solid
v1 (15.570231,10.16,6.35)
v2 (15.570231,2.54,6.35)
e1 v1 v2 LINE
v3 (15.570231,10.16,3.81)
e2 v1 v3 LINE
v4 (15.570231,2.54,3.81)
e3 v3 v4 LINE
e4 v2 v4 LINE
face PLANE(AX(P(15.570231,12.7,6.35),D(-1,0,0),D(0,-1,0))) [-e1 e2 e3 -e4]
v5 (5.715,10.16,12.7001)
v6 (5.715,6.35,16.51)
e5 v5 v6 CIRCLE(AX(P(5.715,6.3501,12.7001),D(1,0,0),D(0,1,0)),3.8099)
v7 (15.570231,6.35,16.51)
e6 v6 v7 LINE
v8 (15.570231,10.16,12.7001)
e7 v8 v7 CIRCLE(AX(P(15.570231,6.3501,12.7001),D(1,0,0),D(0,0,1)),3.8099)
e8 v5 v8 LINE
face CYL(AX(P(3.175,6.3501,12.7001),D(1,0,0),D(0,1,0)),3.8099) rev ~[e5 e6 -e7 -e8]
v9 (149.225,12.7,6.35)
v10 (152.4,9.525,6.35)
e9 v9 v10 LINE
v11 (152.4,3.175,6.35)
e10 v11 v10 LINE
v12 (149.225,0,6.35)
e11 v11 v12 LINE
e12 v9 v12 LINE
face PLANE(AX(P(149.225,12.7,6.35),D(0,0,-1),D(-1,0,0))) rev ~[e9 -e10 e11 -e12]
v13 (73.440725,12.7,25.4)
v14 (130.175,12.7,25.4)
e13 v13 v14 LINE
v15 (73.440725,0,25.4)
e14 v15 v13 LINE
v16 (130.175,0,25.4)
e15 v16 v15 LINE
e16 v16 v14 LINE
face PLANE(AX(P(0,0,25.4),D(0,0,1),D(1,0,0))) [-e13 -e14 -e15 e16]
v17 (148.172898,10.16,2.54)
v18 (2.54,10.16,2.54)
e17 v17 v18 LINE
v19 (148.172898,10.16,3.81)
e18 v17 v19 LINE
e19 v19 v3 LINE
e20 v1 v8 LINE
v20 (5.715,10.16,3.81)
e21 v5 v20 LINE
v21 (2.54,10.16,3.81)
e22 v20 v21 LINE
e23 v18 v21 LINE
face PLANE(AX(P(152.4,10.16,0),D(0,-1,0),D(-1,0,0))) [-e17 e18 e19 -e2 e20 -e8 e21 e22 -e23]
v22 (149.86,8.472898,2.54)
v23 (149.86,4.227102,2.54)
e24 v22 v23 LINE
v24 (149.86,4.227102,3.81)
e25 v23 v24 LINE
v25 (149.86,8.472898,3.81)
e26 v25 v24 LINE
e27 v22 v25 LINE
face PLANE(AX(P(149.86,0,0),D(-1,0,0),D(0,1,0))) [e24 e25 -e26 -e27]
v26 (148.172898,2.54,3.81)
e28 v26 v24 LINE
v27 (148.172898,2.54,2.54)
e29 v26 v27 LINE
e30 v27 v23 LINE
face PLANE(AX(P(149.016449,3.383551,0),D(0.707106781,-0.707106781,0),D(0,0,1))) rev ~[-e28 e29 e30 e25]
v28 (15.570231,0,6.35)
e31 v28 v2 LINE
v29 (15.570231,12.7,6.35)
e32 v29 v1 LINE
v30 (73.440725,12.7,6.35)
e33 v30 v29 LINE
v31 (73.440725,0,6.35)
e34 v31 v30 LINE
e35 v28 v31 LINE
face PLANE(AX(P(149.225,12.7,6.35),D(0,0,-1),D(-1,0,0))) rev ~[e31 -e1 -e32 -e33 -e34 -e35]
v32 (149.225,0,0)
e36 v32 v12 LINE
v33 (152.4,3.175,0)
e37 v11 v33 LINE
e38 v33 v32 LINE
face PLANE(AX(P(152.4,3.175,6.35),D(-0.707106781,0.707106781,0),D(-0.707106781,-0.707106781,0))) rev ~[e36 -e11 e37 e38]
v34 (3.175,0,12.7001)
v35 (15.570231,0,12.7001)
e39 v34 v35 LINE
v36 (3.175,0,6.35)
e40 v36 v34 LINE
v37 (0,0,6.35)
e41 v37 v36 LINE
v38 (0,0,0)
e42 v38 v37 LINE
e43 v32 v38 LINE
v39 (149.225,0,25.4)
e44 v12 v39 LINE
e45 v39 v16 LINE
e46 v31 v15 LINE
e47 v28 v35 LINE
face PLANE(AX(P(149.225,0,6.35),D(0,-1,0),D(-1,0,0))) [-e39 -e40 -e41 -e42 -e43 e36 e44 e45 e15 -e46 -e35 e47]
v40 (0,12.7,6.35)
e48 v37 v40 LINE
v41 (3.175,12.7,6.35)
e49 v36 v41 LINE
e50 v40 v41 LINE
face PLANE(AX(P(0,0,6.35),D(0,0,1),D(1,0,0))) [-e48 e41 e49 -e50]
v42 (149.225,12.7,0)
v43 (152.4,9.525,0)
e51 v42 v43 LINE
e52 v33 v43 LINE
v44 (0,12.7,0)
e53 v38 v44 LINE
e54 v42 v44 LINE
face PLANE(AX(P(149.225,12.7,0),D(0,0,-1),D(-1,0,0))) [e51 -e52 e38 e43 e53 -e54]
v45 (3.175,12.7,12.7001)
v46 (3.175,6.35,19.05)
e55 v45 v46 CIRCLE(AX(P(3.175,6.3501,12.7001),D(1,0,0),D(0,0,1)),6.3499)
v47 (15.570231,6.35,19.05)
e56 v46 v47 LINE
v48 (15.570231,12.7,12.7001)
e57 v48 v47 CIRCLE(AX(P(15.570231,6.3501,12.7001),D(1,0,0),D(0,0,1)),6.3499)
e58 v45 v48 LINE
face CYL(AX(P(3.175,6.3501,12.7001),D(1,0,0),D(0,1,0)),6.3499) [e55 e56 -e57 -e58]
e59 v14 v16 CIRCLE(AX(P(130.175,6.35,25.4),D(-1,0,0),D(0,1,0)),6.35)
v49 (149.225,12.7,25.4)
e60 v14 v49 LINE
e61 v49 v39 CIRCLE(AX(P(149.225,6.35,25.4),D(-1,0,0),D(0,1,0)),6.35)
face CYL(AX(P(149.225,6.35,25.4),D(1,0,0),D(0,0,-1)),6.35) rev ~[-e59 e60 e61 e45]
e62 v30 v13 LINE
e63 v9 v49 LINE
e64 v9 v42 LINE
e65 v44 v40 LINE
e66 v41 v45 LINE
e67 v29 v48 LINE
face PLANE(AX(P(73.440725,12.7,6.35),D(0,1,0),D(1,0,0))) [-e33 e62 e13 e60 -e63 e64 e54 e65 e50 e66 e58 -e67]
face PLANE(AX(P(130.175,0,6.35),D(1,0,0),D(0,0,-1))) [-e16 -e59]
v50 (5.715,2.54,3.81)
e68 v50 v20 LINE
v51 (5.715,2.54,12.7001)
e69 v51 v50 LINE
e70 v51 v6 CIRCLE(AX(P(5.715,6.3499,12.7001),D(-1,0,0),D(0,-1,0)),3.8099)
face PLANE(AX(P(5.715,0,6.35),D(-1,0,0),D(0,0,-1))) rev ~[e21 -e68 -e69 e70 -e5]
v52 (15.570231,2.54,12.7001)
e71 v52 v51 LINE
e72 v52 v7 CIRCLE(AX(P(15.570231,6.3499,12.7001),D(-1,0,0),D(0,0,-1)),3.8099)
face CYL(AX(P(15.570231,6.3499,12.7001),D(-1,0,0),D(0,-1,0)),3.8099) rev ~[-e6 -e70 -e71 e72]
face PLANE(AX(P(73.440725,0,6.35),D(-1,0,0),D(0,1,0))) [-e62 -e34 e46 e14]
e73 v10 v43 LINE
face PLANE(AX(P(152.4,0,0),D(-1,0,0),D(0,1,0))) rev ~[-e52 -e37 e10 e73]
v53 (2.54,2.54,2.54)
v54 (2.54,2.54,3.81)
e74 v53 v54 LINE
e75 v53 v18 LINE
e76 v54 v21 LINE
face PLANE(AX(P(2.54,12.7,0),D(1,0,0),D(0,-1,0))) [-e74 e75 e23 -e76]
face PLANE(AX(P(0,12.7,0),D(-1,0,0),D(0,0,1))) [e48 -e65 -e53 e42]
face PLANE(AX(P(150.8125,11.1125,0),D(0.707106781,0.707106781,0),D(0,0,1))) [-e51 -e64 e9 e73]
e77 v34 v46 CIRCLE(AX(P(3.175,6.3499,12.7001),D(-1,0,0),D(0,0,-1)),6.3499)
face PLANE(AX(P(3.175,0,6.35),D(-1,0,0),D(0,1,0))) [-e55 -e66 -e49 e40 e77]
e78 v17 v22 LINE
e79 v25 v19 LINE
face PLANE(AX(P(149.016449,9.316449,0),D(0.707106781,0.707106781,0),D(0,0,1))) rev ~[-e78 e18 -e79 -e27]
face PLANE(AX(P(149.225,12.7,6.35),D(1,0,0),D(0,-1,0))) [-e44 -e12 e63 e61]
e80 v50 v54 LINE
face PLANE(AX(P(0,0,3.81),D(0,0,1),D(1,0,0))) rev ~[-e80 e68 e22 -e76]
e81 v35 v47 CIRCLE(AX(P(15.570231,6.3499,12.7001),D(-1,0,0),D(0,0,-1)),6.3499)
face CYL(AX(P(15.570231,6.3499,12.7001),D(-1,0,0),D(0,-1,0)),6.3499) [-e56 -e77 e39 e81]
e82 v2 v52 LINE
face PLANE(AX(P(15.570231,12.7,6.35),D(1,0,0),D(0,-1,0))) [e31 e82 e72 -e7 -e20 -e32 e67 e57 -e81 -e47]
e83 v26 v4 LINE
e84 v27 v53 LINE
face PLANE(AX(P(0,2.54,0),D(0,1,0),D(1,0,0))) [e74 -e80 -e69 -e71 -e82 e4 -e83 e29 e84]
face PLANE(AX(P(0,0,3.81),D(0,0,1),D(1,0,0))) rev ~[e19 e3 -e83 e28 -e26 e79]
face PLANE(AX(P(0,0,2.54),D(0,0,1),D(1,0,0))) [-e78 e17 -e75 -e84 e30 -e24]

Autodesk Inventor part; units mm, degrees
ref_plane "YZ Plane" through (0, 0, 0) normal (1, 0, 0) x (0, 1, 0)
ref_plane "XZ Plane" through (0, 0, 0) normal (0, 1, 0) x (-1, 0, 0)
ref_plane "XY Plane" through (0, 0, 0) normal (0, 0, 1) x (1, 0, 0)
sketch "Sketch1" plane through (0, 0, 0) normal (0, 0, 1) x (1, 0, 0)
  line L0 (0, 0) -> (152.4, 0)
  line L1 (152.4, 0) -> (152.4, 12.7)
  line L2 (152.4, 12.7) -> (0, 12.7)
  line L3 (0, 12.7) -> (0, 0)
  dimension "d0" = 152.4
  dimension "d1" = 12.7
sketch "Sketch1 outline for Extrusion1" plane through (0, 0, 0) normal (0, 0, 1) x (1, 0, 0)
  line L0 (0, 12.7) -> (0, 0)
  line L1 (152.4, 12.7) -> (0, 12.7)
  line L2 (152.4, 0) -> (152.4, 12.7)
  line L3 (0, 0) -> (152.4, 0)
extrude "Extrusion1" add sketch "Sketch1 outline for Extrusion1" along normal blind 6.35
chamfer "Chamfer1" distance 3.175 angle 45 2 edges at (152.4, 12.7, 3.175) (152.4, 0, 3.175)
sketch "Sketch2" plane through (0, 0, 6.35) normal (0, 0, 1) x (1, 0, 0)
  line L0 (0, 0) -> (149.225, 0)
  line L1 (149.225, 12.7) -> (0, 12.7)
  line L2 (15.570231, 0) -> (3.175, 0)
  line L3 (3.175, 0) -> (3.175, 12.7)
  line L4 (3.175, 12.7) -> (15.570231, 12.7)
  line L5 (15.570231, 12.7) -> (15.570231, 0)
  point P0 (3.175, 0)
sketch "Sketch2 outline for Extrusion2" plane through (0, 0, 6.35) normal (0, 0, 1) x (1, 0, 0)
  line L0 (15.570231, 0) -> (3.175, 0)
  line L1 (3.175, 0) -> (3.175, 12.7)
  line L2 (3.175, 12.7) -> (15.570231, 12.7)
  line L3 (15.570231, 12.7) -> (15.570231, 0)
extrude "Extrusion2" add sketch "Sketch2 outline for Extrusion2" along normal blind 12.7
fillet "Fillet1" radius 6.35 2 edges at (9.3726, 12.7, 19.05) (9.3726, 0, 19.05)
shell "Shell1" thickness 2.54 removed faces 1 at (15.570231, 8.466667, 10.5834)
sketch "Sketch3" plane through (0, 0, 6.35) normal (0, 0, 1) x (1, 0, 0)
  line L0 (0, 0) -> (149.225, 0)
  line L1 (149.225, 12.7) -> (0, 12.7)
  line L2 (149.225, 0) -> (73.440725, 0)
  line L3 (73.440725, 0) -> (73.440725, 12.7)
  line L4 (73.440725, 12.7) -> (149.225, 12.7)
  line L5 (149.225, 12.7) -> (149.225, 0)
sketch "Sketch3 outline for Extrusion3" plane through (0, 0, 6.35) normal (0, 0, 1) x (1, 0, 0)
  line L0 (149.225, 0) -> (73.440725, 0)
  line L1 (73.440725, 0) -> (73.440725, 12.7)
  line L2 (73.440725, 12.7) -> (149.225, 12.7)
  line L3 (149.225, 12.7) -> (149.225, 0)
extrude "Extrusion3" add sketch "Sketch3 outline for Extrusion3" along normal blind 19.05
sketch "Sketch4" plane through (149.225, 0, 6.35) normal (1, 0, 0) x (0, 0, -1)
  line L0 (-19.05, 12.7) -> (-19.05, 0) projected
  circle A0 centre (-19.05, 6.35) radius 6.35
  point P0 (6.35, 0)
sketch "Sketch4 outline for Extrusion4" plane through (149.225, 0, 6.35) normal (1, 0, 0) x (0, 0, -1)
  circle A0 centre (-19.05, 6.35) radius 6.35
extrude "Extrusion4" cut sketch "Sketch4 outline for Extrusion4" against normal blind 19.05
properties part number "Lolipop"
